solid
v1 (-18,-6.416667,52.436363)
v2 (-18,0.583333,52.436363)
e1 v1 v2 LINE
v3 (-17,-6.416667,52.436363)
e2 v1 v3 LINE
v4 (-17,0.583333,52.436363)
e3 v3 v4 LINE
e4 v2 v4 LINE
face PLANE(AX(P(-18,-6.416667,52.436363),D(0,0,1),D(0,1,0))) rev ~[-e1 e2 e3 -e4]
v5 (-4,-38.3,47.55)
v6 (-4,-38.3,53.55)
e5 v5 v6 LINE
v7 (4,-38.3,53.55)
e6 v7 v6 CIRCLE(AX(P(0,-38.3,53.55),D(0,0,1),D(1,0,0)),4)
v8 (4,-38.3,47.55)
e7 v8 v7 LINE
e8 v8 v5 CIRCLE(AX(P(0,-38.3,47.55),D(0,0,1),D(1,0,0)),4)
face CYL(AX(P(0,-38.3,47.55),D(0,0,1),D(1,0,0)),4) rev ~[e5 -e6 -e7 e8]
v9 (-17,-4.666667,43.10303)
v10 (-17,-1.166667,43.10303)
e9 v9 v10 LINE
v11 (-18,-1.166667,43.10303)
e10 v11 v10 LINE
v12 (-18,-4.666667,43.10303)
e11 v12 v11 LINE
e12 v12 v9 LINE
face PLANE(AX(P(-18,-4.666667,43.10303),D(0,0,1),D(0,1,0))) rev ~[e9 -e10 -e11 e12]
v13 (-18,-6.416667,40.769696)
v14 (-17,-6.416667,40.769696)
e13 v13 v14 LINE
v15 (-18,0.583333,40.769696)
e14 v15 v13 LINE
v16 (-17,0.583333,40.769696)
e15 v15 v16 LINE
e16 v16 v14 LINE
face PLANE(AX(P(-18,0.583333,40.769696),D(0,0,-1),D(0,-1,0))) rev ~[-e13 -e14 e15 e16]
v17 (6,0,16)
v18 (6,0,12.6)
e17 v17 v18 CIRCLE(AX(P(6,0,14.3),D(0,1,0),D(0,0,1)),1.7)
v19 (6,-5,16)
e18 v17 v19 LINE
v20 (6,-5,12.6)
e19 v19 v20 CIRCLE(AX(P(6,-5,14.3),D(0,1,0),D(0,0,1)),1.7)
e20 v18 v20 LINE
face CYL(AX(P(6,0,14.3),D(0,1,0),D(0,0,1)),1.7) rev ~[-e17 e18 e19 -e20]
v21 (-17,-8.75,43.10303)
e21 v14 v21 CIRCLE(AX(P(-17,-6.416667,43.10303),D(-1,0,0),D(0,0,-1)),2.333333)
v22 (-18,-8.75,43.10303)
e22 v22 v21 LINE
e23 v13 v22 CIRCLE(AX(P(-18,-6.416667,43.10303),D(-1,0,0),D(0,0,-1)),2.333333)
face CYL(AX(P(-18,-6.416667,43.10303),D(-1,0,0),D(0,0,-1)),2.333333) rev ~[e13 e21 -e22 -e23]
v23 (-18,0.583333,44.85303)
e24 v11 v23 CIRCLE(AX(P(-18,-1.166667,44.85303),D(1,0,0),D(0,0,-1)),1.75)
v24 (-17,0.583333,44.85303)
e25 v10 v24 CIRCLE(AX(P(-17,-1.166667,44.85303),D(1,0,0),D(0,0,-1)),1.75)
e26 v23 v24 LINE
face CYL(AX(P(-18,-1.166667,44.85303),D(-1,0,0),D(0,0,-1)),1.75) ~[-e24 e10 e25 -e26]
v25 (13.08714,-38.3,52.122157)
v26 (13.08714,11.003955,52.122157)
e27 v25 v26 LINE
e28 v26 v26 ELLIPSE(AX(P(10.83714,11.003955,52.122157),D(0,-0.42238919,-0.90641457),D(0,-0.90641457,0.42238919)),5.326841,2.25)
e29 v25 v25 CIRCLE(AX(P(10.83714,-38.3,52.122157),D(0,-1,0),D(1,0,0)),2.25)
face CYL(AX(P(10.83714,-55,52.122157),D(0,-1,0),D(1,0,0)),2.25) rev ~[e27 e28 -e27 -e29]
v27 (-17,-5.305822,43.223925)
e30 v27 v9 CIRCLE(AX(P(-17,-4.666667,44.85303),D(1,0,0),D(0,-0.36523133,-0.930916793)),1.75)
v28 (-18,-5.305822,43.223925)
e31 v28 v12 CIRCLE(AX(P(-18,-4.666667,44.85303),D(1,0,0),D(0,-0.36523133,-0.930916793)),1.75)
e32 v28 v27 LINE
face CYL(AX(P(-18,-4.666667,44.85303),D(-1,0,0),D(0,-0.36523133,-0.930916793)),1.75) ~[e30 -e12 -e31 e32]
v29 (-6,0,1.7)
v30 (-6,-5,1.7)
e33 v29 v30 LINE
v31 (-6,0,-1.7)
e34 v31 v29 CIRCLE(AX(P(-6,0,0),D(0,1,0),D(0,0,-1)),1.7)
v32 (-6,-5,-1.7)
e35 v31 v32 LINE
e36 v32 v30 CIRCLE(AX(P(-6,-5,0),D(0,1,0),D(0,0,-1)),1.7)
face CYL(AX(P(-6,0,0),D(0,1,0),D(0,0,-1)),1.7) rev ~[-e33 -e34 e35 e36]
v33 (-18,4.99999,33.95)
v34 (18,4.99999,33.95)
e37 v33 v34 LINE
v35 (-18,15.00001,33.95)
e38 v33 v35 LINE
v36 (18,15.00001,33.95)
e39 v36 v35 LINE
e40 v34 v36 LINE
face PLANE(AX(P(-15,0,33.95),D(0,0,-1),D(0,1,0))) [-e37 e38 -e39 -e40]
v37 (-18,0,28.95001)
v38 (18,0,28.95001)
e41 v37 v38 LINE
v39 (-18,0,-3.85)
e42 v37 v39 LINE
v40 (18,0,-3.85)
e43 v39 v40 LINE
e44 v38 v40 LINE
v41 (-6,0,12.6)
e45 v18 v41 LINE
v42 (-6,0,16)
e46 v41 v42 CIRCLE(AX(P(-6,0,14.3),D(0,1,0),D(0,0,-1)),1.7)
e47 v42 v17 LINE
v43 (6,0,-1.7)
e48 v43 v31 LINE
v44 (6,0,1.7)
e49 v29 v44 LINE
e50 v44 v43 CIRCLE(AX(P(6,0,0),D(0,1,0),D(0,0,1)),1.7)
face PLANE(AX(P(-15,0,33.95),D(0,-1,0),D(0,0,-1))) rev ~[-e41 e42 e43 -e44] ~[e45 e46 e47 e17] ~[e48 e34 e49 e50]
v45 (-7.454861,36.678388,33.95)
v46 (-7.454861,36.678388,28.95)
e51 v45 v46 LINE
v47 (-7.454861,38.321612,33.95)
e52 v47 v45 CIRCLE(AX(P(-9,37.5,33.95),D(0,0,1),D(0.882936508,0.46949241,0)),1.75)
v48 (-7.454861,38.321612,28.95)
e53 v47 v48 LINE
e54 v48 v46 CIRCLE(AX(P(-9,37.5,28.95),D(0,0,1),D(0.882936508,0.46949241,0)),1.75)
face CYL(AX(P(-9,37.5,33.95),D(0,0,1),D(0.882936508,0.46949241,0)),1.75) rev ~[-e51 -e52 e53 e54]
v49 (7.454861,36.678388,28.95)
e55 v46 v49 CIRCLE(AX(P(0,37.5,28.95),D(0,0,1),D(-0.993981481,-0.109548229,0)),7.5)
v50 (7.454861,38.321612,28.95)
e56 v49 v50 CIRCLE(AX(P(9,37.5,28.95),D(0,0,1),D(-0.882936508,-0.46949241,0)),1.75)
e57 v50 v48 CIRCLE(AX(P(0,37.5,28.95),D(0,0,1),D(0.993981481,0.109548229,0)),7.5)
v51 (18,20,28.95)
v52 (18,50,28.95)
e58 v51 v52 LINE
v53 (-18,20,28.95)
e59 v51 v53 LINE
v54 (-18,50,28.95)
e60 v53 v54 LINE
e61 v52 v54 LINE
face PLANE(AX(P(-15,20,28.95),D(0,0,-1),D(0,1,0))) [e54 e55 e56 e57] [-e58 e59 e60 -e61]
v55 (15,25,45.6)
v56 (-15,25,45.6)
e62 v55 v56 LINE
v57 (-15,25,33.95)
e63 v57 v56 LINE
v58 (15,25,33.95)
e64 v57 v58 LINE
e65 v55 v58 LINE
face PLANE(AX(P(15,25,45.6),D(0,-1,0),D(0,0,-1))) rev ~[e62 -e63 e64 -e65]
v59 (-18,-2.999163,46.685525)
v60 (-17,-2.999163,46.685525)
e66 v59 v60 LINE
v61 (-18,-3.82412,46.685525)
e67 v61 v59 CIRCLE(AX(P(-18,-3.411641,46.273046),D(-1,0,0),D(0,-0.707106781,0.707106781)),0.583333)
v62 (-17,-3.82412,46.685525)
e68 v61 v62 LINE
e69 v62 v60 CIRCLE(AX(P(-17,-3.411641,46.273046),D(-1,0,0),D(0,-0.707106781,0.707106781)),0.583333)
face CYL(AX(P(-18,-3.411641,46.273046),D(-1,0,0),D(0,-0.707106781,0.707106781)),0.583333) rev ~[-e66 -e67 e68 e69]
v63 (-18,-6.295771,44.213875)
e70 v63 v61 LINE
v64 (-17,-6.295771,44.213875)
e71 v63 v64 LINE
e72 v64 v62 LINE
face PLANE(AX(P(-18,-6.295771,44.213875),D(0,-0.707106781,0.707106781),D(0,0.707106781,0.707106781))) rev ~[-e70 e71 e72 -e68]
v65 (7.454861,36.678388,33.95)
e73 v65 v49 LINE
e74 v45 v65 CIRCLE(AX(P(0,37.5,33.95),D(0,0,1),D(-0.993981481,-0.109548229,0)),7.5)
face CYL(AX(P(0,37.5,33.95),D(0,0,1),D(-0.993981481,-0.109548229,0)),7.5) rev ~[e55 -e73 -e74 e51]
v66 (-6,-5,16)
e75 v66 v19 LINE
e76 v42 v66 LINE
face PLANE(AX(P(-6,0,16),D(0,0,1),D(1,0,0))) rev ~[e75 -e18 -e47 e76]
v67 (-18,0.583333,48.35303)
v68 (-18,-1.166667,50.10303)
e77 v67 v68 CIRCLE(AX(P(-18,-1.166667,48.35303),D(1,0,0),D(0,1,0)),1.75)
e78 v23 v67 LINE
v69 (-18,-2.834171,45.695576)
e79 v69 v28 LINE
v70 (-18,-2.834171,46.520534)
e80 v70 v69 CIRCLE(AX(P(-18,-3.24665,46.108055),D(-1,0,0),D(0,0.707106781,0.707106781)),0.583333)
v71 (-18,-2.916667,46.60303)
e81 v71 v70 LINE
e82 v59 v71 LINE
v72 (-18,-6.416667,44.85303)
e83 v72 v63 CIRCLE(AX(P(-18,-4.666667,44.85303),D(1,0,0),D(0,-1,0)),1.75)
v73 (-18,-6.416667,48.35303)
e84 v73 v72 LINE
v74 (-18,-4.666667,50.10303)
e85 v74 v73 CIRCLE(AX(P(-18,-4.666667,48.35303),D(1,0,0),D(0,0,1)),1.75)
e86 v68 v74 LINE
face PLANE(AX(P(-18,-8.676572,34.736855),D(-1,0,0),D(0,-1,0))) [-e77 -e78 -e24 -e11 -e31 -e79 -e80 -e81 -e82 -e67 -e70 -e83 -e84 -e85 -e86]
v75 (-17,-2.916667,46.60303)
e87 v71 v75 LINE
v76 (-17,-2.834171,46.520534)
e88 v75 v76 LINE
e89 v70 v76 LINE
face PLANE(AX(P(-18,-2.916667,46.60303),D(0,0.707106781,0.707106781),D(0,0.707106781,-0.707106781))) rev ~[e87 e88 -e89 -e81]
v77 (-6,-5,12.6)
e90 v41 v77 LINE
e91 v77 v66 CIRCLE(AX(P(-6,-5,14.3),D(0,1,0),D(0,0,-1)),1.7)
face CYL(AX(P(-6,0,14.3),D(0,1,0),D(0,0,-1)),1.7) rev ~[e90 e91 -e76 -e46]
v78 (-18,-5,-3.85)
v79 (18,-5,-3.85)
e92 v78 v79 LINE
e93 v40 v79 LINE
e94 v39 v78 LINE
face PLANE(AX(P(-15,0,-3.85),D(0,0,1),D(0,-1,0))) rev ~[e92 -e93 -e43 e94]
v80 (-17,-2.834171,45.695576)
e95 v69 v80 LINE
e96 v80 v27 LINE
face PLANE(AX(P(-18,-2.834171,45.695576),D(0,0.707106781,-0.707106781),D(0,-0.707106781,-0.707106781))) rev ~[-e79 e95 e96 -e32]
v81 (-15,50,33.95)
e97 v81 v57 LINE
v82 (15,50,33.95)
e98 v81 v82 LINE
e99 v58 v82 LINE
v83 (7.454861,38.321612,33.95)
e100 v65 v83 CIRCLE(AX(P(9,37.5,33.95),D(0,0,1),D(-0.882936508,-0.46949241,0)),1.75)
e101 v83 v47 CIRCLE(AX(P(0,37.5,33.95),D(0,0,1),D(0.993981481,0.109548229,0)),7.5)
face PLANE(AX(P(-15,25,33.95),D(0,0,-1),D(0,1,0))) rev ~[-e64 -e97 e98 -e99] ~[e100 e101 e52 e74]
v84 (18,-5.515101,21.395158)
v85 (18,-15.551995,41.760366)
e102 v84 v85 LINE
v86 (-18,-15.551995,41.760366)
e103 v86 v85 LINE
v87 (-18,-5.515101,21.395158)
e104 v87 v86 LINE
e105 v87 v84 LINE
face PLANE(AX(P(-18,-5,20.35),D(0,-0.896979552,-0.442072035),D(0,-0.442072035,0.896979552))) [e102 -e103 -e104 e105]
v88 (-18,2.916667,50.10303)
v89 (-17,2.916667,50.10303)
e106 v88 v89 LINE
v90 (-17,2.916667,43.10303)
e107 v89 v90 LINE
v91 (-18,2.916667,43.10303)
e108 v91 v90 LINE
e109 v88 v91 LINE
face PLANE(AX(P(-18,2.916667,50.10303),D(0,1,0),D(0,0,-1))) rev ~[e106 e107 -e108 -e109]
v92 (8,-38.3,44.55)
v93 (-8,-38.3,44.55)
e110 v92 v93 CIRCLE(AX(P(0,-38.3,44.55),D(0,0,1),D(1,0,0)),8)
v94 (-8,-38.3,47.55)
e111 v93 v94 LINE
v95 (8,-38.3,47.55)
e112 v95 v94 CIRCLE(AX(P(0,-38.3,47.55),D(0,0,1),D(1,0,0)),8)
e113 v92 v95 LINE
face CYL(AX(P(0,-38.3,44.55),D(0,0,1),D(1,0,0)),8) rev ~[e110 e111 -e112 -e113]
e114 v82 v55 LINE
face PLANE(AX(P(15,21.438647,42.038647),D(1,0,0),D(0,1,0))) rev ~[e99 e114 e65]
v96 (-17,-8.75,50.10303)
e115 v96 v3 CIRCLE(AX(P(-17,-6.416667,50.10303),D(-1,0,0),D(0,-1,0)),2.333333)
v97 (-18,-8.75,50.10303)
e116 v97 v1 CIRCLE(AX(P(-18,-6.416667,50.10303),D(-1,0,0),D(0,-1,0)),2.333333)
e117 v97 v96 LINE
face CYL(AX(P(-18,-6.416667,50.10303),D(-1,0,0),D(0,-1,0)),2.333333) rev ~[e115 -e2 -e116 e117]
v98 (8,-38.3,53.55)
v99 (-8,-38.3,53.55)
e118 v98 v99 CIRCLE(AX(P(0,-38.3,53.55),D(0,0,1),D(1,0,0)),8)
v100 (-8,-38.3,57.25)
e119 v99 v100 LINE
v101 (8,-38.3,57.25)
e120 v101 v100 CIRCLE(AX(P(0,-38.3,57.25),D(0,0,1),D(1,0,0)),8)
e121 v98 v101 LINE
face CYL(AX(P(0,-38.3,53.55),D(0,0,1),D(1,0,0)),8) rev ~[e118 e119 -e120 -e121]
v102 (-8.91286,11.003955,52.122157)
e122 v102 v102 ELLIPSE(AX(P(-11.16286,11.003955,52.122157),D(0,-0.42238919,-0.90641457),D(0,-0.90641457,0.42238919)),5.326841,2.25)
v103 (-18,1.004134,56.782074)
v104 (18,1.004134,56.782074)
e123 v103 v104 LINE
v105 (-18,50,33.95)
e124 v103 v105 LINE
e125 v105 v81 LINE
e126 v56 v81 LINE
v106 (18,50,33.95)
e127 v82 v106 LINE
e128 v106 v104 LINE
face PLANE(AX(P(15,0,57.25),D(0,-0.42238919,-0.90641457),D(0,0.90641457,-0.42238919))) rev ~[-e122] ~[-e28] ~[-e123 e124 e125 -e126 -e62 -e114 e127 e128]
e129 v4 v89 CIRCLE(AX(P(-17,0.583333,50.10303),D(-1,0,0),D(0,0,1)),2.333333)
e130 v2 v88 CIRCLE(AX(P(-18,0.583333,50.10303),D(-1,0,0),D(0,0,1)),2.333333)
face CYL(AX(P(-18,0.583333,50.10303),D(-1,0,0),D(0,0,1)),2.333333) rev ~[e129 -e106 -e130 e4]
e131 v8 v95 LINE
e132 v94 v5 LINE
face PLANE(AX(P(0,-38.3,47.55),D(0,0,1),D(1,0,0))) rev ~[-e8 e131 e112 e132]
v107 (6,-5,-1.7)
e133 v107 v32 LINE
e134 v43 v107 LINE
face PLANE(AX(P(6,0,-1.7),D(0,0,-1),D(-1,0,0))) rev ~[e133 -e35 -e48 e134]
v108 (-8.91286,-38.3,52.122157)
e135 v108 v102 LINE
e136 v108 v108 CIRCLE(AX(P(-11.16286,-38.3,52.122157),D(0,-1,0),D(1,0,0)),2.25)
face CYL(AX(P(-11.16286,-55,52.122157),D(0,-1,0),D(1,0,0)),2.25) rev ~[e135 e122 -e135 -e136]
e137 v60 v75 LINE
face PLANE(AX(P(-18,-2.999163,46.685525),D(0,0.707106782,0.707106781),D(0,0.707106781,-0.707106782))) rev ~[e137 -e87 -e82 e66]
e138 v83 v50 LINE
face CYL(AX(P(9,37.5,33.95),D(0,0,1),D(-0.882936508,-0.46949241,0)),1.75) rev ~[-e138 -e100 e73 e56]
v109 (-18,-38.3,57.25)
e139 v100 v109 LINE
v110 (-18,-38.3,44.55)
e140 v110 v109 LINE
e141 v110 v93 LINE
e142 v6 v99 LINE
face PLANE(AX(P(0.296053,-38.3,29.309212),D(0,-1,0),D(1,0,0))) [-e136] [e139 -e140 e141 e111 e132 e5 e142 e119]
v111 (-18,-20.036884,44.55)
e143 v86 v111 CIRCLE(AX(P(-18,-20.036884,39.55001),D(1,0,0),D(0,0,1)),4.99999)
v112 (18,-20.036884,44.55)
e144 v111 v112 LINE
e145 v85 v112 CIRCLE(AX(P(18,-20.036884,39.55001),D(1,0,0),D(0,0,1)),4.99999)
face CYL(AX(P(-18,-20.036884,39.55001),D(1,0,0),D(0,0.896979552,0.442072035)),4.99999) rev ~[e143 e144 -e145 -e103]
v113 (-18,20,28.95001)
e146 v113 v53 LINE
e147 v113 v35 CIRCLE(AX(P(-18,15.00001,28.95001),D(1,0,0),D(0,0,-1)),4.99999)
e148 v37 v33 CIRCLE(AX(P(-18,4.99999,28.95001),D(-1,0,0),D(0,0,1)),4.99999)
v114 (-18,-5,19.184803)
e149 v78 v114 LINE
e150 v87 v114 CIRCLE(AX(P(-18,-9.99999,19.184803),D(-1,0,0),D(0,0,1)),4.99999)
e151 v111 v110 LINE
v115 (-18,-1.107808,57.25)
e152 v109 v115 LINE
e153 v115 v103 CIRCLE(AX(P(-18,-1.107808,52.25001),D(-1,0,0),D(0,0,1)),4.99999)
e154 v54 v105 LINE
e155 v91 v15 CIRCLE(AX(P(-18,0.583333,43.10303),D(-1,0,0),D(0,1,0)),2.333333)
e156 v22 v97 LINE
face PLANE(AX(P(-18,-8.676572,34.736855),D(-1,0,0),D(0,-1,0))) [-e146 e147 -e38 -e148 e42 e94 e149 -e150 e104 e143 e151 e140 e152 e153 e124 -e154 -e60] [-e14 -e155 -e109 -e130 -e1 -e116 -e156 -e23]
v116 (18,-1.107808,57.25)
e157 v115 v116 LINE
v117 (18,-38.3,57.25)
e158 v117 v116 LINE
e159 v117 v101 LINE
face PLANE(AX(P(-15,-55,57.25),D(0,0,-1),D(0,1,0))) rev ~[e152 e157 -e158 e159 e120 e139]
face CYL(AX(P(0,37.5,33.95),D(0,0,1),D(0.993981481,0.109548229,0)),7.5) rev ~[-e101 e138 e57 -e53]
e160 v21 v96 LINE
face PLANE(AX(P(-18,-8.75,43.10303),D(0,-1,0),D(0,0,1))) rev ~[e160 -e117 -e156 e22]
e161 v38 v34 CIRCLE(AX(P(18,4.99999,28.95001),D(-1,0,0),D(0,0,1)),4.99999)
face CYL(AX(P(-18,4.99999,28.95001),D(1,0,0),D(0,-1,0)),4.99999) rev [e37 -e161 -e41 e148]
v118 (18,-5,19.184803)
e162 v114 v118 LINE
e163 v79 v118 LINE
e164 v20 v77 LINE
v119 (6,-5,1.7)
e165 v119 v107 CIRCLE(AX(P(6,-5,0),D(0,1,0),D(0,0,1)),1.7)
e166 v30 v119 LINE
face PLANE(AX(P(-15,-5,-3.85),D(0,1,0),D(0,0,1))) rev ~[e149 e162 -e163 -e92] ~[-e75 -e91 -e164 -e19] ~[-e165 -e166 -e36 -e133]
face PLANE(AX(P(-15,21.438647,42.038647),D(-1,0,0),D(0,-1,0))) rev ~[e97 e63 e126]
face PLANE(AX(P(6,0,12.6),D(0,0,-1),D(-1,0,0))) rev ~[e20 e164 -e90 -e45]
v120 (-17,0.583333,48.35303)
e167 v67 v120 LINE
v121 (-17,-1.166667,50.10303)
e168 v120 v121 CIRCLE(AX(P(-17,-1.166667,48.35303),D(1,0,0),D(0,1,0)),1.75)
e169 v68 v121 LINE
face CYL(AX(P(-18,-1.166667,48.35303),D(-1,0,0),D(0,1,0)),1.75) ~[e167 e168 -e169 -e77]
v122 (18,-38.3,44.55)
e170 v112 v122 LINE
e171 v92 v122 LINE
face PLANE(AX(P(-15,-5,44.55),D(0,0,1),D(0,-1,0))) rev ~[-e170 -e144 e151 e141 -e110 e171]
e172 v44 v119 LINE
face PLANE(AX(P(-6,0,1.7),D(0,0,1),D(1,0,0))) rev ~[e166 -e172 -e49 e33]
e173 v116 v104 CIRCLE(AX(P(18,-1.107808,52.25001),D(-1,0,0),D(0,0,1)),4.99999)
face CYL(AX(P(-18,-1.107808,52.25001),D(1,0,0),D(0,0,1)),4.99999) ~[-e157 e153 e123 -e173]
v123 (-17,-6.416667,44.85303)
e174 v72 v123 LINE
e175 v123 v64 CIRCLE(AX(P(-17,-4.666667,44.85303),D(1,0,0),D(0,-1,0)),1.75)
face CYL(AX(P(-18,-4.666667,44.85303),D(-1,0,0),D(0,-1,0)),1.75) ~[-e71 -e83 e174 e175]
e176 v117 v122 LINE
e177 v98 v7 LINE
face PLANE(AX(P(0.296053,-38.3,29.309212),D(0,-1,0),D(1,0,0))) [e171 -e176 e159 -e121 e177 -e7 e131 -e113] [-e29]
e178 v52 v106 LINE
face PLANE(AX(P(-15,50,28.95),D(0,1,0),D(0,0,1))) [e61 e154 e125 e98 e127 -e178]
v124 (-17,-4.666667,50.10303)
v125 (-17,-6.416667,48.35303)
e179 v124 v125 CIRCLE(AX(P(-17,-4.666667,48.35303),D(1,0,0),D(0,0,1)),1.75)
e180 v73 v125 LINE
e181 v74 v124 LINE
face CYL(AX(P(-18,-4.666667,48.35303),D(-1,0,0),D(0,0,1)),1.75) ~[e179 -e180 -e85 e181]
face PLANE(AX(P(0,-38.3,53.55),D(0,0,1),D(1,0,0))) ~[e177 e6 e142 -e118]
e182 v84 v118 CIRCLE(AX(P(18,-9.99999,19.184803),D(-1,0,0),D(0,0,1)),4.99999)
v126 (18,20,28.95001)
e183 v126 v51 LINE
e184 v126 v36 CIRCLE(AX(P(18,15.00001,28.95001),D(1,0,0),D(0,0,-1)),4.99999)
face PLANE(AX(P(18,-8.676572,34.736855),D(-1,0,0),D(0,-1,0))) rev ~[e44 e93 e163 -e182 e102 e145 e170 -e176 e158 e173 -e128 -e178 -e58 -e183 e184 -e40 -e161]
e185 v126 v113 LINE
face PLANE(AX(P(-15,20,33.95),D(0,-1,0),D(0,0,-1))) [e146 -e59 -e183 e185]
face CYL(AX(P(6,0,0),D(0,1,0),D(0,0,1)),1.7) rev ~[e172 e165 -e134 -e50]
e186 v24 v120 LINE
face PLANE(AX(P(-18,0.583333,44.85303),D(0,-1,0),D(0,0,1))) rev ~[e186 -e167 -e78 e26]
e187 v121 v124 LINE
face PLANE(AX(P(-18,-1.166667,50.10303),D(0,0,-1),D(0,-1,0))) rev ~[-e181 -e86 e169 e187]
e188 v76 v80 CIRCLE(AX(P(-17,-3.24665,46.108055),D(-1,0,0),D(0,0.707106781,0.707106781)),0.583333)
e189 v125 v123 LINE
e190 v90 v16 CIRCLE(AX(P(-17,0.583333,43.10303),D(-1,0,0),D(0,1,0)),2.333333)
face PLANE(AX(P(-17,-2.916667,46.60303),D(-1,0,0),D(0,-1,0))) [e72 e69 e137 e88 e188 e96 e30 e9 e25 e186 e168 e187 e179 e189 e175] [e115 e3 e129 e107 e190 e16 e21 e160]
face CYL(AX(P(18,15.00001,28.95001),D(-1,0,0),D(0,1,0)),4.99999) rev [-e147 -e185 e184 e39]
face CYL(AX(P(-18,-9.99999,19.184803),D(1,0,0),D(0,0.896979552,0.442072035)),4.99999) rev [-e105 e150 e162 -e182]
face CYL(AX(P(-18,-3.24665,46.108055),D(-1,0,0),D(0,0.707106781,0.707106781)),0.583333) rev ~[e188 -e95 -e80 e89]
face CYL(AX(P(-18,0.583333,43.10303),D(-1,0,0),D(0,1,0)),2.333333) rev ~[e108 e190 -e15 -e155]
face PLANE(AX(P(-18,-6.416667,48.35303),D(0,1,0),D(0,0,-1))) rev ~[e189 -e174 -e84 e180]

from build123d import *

# Parameters (mm, degrees)
F0_W      = 30
F0_H      = 22
F1_DEPTH  = 5
F2_DEPTH  = 39.1
F3_W      = 30
F3_H      = 12.7
F4_DEPTH  = 50
F8_W      = 30
F8_H      = 5
F9_DEPTH  = 25
F10_W     = 30
F10_H     = 5
F11_DEPTH = 5
F12_W     = 30
F12_H     = 5
F13_DEPTH = 25
F15_DEPTH = 25
F16_DEPTH = 3
F18_DEPTH = 3
F19_DEPTH = 3
F21_DEPTH = 3
F23_DEPTH = 30
F24_R     = 2.25
F25_DEPTH = 500
F26_W     = 68.0921077728
F26_H     = 72.8289508261
F27_DEPTH = 25
F29_DEPTH = 36
F30_R     = 4.99999
F32_DEPTH = 1


# Not quite as in the source:
# - a fillet or chamfer is up to 0.001 mm smaller than in the source, because OpenCascade refuses the exact size


with BuildPart() as f1:
    # F0 (on Front) → F1 (new body)
    with BuildSketch(Plane.XZ):
        with Locations((0, 7.15)):
            Rectangle(F0_W, F0_H)
        with BuildLine():
            ThreePointArc((-6, -1.7), (-7.7, 0), (-6, 1.7))
            Line((-6, 1.7), (6, 1.7))
            ThreePointArc((6, 1.7), (7.7, 0), (6, -1.7))
            Line((6, -1.7), (-6, -1.7))
        make_face(mode=Mode.SUBTRACT)
        with BuildLine():
            ThreePointArc((-6, 12.6), (-7.7, 14.3), (-6, 16))
            Line((-6, 16), (6, 16))
            ThreePointArc((6, 16), (7.7, 14.3), (6, 12.6))
            Line((6, 12.6), (-6, 12.6))
        make_face(mode=Mode.SUBTRACT)
    extrude(amount=F1_DEPTH)

    # F2 (add): a face of the model
    f2_faces = [f1.faces().sort_by_distance(p)[0] for p in [
        (0, -2.5, 18.15),
    ]]
    extrude(f2_faces, amount=F2_DEPTH)

    # F3 (on face) → F4 (join)
    with BuildSketch(Plane.XZ.offset(5)):
        with Locations((0, 50.9)):
            Rectangle(F3_W, F3_H)
    extrude(amount=F4_DEPTH)

    # F6 (on offset) → F7 (revolve, cut)
    with BuildSketch(Plane.XZ.offset(38.3)):
        Polygon((8, 57.25), (0, 57.25), (0, 44.55), (8, 44.55), (8, 47.55), (4, 47.55), (4, 53.55), (8, 53.55), align=None)
    revolve(axis=Axis((0, -38.3, 50.9), (0, 0, 1)), mode=Mode.SUBTRACT)

    # F8 (on face) → F9 (join)
    with BuildSketch(Plane(origin=(0, 0, 0), x_dir=(-1, 0, 0), z_dir=(0, 1, 0))):
        with Locations((0, 36.45)):
            Rectangle(F8_W, F8_H)
    extrude(amount=F9_DEPTH)

    # F10 (on face) → F11 (join)
    with BuildSketch(Plane(origin=(0, 0, 33.95), x_dir=(1, 0, 0), z_dir=(0, 0, -1))):
        with Locations((0, -22.5)):
            Rectangle(F10_W, F10_H)
    extrude(amount=F11_DEPTH)

    # F12 (on face) → F13 (join)
    with BuildSketch(Plane(origin=(0, 25, 0), x_dir=(-1, 0, 0), z_dir=(0, 1, 0))):
        with Locations((0, 31.45)):
            Rectangle(F12_W, F12_H)
    extrude(amount=F13_DEPTH)

    # F14 (on face) → F15 (cut)
    with BuildSketch(Plane.XY.offset(33.95)):
        with BuildLine():
            ThreePointArc((7.4548611111, 38.3216117173), (0, 45), (-7.4548611111, 38.3216117173))
            ThreePointArc((-7.4548611111, 38.3216117173), (-10.75, 37.5), (-7.4548611111, 36.6783882827))
            ThreePointArc((-7.4548611111, 36.6783882827), (0, 30), (7.4548611111, 36.6783882827))
            ThreePointArc((7.4548611111, 36.6783882827), (10.75, 37.5), (7.4548611111, 38.3216117173))
        make_face()
    extrude(amount=-F15_DEPTH, mode=Mode.SUBTRACT)

    # F16 (add): a face of the model
    f16_faces = [f1.faces().sort_by_distance(p)[0] for p in [
        (15, -2.5, -2.6351662665),
    ]]
    extrude(f16_faces, amount=F16_DEPTH)

    # F17 (on face) → F18 (join)
    with BuildSketch(Plane.YZ.offset(18)):
        Polygon((50, 33.95), (0, 57.25), (0, 38.95), (25, 38.95), (25, 33.95), align=None)
    extrude(amount=-F18_DEPTH)

    # F19 (add): a face of the model
    f19_faces = [f1.faces().sort_by_distance(p)[0] for p in [
        (-15, -2.5, -2.6351662665),
    ]]
    extrude(f19_faces, amount=F19_DEPTH)

    # F20 (on face) → F21 (join)
    with BuildSketch(Plane(origin=(-18, 0, 0), x_dir=(0, -1, 0), z_dir=(-1, 0, 0))):
        Polygon((0, 57.25), (-50, 33.95), (-25, 33.95), (-25, 38.95), (0, 38.95), align=None)
    extrude(amount=-F21_DEPTH)

    # F22 (on face) → F23 (join, through all)
    with BuildSketch(Plane(origin=(15, 0, 0), x_dir=(0, -1, 0), z_dir=(-1, 0, 0))):
        Polygon((-25, 45.6), (-25, 38.95), (0, 38.95), (0, 57.25), align=None)
    extrude(amount=F23_DEPTH)

    # F24 (on face) → F25 (cut)
    with BuildSketch(Plane.XZ.offset(55)):
        with Locations((-11.1628601777, 52.1221570671)):
            Circle(F24_R)
        with Locations((10.8371398223, 52.1221570671)):
            Circle(F24_R)
    extrude(amount=-F25_DEPTH, mode=Mode.SUBTRACT)

    # F26 (on offset) → F27 (cut)
    with BuildSketch(Plane.XZ.offset(38.3)):
        with Locations((0.2960525453, 29.3092119973)):
            Rectangle(F26_W, F26_H)
    extrude(amount=F27_DEPTH, mode=Mode.SUBTRACT)

    # F28 (on face) → F29 (join)
    with BuildSketch(Plane(origin=(-18, 0, 0), x_dir=(0, -1, 0), z_dir=(-1, 0, 0))):
        Polygon((5, 44.55), (5, 20.35), (16.9268529862, 44.55), align=None)
    extrude(amount=-F29_DEPTH)

    # F30 (radius 5 in the source; OpenCascade refuses exactly that, so slightly less here)
    f30_edges = [f1.edges().sort_by_distance(p)[0] for p in [
        (0, -16.926853, 44.55),
        (0, 0, 57.25),
        (0, 20, 33.95),
        (0, 0, 33.95),
        (0, -5, 20.35),
    ]]
    fillet(f30_edges, radius=F30_R)

    # F31 (on face) → F32 (cut)
    with BuildSketch(Plane(origin=(-18, 0, 0), x_dir=(0, -1, 0), z_dir=(-1, 0, 0))):
        with BuildLine():
            ThreePointArc((-2.9166666459, 43.103029569), (-2.2332491353, 41.4531137462), (-0.5833333125, 40.7696962357))
            Line((-0.5833333125, 40.7696962357), (6.4166666875, 40.7696962357))
            ThreePointArc((6.4166666875, 40.7696962357), (8.0665825102, 41.4531137462), (8.7500000208, 43.103029569))
            Line((8.7500000208, 43.103029569), (8.7500000208, 50.103029569))
            ThreePointArc((8.7500000208, 50.103029569), (8.0665825102, 51.7529453918), (6.4166666875, 52.4363629023))
            Line((6.4166666875, 52.4363629023), (-0.5833333125, 52.4363629023))
            ThreePointArc((-0.5833333125, 52.4363629023), (-2.2332491353, 51.7529453918), (-2.9166666459, 50.103029569))
            Line((-2.9166666459, 50.103029569), (-2.9166666459, 43.103029569))
        make_face()
        with BuildLine():
            Line((4.6666666875, 43.103029569), (1.1666666875, 43.103029569))
            ThreePointArc((1.1666666875, 43.103029569), (-0.0707701796, 43.6155927019), (-0.5833333125, 44.853029569))
            Line((-0.5833333125, 44.853029569), (-0.5833333125, 48.353029569))
            ThreePointArc((-0.5833333125, 48.353029569), (-0.0707701796, 49.5904664361), (1.1666666875, 50.103029569))
            Line((1.1666666875, 50.103029569), (4.6666666875, 50.103029569))
            ThreePointArc((4.6666666875, 50.103029569), (5.9041035545, 49.5904664361), (6.4166666875, 48.353029569))
            Line((6.4166666875, 48.353029569), (6.4166666875, 44.853029569))
            ThreePointArc((6.4166666875, 44.853029569), (6.3861771815, 44.5277855668), (6.2957710749, 44.2138747406))
            Line((6.2957710875, 44.2138747357), (3.8241204375, 46.6855253857))
            ThreePointArc((3.8241204265, 46.6855253747), (3.4116414708, 46.8563797523), (2.9991625151, 46.6855253747))
            Line((2.9991625041, 46.6855253857), (2.9166666875, 46.603029569))
            Line((2.9166666875, 46.603029569), (2.8341708708, 46.5205337523))
            ThreePointArc((2.8341708818, 46.5205337413), (2.6633165041, 46.1080547857), (2.8341708818, 45.69557583))
            Line((2.8341708708, 45.695575819), (5.3058215208, 43.223925169))
            ThreePointArc((5.3058215159, 43.2239251815), (4.9919106896, 43.133519075), (4.6666666875, 43.103029569))
        make_face(mode=Mode.SUBTRACT)
    extrude(amount=-F32_DEPTH, mode=Mode.SUBTRACT)


solid = f1.part
